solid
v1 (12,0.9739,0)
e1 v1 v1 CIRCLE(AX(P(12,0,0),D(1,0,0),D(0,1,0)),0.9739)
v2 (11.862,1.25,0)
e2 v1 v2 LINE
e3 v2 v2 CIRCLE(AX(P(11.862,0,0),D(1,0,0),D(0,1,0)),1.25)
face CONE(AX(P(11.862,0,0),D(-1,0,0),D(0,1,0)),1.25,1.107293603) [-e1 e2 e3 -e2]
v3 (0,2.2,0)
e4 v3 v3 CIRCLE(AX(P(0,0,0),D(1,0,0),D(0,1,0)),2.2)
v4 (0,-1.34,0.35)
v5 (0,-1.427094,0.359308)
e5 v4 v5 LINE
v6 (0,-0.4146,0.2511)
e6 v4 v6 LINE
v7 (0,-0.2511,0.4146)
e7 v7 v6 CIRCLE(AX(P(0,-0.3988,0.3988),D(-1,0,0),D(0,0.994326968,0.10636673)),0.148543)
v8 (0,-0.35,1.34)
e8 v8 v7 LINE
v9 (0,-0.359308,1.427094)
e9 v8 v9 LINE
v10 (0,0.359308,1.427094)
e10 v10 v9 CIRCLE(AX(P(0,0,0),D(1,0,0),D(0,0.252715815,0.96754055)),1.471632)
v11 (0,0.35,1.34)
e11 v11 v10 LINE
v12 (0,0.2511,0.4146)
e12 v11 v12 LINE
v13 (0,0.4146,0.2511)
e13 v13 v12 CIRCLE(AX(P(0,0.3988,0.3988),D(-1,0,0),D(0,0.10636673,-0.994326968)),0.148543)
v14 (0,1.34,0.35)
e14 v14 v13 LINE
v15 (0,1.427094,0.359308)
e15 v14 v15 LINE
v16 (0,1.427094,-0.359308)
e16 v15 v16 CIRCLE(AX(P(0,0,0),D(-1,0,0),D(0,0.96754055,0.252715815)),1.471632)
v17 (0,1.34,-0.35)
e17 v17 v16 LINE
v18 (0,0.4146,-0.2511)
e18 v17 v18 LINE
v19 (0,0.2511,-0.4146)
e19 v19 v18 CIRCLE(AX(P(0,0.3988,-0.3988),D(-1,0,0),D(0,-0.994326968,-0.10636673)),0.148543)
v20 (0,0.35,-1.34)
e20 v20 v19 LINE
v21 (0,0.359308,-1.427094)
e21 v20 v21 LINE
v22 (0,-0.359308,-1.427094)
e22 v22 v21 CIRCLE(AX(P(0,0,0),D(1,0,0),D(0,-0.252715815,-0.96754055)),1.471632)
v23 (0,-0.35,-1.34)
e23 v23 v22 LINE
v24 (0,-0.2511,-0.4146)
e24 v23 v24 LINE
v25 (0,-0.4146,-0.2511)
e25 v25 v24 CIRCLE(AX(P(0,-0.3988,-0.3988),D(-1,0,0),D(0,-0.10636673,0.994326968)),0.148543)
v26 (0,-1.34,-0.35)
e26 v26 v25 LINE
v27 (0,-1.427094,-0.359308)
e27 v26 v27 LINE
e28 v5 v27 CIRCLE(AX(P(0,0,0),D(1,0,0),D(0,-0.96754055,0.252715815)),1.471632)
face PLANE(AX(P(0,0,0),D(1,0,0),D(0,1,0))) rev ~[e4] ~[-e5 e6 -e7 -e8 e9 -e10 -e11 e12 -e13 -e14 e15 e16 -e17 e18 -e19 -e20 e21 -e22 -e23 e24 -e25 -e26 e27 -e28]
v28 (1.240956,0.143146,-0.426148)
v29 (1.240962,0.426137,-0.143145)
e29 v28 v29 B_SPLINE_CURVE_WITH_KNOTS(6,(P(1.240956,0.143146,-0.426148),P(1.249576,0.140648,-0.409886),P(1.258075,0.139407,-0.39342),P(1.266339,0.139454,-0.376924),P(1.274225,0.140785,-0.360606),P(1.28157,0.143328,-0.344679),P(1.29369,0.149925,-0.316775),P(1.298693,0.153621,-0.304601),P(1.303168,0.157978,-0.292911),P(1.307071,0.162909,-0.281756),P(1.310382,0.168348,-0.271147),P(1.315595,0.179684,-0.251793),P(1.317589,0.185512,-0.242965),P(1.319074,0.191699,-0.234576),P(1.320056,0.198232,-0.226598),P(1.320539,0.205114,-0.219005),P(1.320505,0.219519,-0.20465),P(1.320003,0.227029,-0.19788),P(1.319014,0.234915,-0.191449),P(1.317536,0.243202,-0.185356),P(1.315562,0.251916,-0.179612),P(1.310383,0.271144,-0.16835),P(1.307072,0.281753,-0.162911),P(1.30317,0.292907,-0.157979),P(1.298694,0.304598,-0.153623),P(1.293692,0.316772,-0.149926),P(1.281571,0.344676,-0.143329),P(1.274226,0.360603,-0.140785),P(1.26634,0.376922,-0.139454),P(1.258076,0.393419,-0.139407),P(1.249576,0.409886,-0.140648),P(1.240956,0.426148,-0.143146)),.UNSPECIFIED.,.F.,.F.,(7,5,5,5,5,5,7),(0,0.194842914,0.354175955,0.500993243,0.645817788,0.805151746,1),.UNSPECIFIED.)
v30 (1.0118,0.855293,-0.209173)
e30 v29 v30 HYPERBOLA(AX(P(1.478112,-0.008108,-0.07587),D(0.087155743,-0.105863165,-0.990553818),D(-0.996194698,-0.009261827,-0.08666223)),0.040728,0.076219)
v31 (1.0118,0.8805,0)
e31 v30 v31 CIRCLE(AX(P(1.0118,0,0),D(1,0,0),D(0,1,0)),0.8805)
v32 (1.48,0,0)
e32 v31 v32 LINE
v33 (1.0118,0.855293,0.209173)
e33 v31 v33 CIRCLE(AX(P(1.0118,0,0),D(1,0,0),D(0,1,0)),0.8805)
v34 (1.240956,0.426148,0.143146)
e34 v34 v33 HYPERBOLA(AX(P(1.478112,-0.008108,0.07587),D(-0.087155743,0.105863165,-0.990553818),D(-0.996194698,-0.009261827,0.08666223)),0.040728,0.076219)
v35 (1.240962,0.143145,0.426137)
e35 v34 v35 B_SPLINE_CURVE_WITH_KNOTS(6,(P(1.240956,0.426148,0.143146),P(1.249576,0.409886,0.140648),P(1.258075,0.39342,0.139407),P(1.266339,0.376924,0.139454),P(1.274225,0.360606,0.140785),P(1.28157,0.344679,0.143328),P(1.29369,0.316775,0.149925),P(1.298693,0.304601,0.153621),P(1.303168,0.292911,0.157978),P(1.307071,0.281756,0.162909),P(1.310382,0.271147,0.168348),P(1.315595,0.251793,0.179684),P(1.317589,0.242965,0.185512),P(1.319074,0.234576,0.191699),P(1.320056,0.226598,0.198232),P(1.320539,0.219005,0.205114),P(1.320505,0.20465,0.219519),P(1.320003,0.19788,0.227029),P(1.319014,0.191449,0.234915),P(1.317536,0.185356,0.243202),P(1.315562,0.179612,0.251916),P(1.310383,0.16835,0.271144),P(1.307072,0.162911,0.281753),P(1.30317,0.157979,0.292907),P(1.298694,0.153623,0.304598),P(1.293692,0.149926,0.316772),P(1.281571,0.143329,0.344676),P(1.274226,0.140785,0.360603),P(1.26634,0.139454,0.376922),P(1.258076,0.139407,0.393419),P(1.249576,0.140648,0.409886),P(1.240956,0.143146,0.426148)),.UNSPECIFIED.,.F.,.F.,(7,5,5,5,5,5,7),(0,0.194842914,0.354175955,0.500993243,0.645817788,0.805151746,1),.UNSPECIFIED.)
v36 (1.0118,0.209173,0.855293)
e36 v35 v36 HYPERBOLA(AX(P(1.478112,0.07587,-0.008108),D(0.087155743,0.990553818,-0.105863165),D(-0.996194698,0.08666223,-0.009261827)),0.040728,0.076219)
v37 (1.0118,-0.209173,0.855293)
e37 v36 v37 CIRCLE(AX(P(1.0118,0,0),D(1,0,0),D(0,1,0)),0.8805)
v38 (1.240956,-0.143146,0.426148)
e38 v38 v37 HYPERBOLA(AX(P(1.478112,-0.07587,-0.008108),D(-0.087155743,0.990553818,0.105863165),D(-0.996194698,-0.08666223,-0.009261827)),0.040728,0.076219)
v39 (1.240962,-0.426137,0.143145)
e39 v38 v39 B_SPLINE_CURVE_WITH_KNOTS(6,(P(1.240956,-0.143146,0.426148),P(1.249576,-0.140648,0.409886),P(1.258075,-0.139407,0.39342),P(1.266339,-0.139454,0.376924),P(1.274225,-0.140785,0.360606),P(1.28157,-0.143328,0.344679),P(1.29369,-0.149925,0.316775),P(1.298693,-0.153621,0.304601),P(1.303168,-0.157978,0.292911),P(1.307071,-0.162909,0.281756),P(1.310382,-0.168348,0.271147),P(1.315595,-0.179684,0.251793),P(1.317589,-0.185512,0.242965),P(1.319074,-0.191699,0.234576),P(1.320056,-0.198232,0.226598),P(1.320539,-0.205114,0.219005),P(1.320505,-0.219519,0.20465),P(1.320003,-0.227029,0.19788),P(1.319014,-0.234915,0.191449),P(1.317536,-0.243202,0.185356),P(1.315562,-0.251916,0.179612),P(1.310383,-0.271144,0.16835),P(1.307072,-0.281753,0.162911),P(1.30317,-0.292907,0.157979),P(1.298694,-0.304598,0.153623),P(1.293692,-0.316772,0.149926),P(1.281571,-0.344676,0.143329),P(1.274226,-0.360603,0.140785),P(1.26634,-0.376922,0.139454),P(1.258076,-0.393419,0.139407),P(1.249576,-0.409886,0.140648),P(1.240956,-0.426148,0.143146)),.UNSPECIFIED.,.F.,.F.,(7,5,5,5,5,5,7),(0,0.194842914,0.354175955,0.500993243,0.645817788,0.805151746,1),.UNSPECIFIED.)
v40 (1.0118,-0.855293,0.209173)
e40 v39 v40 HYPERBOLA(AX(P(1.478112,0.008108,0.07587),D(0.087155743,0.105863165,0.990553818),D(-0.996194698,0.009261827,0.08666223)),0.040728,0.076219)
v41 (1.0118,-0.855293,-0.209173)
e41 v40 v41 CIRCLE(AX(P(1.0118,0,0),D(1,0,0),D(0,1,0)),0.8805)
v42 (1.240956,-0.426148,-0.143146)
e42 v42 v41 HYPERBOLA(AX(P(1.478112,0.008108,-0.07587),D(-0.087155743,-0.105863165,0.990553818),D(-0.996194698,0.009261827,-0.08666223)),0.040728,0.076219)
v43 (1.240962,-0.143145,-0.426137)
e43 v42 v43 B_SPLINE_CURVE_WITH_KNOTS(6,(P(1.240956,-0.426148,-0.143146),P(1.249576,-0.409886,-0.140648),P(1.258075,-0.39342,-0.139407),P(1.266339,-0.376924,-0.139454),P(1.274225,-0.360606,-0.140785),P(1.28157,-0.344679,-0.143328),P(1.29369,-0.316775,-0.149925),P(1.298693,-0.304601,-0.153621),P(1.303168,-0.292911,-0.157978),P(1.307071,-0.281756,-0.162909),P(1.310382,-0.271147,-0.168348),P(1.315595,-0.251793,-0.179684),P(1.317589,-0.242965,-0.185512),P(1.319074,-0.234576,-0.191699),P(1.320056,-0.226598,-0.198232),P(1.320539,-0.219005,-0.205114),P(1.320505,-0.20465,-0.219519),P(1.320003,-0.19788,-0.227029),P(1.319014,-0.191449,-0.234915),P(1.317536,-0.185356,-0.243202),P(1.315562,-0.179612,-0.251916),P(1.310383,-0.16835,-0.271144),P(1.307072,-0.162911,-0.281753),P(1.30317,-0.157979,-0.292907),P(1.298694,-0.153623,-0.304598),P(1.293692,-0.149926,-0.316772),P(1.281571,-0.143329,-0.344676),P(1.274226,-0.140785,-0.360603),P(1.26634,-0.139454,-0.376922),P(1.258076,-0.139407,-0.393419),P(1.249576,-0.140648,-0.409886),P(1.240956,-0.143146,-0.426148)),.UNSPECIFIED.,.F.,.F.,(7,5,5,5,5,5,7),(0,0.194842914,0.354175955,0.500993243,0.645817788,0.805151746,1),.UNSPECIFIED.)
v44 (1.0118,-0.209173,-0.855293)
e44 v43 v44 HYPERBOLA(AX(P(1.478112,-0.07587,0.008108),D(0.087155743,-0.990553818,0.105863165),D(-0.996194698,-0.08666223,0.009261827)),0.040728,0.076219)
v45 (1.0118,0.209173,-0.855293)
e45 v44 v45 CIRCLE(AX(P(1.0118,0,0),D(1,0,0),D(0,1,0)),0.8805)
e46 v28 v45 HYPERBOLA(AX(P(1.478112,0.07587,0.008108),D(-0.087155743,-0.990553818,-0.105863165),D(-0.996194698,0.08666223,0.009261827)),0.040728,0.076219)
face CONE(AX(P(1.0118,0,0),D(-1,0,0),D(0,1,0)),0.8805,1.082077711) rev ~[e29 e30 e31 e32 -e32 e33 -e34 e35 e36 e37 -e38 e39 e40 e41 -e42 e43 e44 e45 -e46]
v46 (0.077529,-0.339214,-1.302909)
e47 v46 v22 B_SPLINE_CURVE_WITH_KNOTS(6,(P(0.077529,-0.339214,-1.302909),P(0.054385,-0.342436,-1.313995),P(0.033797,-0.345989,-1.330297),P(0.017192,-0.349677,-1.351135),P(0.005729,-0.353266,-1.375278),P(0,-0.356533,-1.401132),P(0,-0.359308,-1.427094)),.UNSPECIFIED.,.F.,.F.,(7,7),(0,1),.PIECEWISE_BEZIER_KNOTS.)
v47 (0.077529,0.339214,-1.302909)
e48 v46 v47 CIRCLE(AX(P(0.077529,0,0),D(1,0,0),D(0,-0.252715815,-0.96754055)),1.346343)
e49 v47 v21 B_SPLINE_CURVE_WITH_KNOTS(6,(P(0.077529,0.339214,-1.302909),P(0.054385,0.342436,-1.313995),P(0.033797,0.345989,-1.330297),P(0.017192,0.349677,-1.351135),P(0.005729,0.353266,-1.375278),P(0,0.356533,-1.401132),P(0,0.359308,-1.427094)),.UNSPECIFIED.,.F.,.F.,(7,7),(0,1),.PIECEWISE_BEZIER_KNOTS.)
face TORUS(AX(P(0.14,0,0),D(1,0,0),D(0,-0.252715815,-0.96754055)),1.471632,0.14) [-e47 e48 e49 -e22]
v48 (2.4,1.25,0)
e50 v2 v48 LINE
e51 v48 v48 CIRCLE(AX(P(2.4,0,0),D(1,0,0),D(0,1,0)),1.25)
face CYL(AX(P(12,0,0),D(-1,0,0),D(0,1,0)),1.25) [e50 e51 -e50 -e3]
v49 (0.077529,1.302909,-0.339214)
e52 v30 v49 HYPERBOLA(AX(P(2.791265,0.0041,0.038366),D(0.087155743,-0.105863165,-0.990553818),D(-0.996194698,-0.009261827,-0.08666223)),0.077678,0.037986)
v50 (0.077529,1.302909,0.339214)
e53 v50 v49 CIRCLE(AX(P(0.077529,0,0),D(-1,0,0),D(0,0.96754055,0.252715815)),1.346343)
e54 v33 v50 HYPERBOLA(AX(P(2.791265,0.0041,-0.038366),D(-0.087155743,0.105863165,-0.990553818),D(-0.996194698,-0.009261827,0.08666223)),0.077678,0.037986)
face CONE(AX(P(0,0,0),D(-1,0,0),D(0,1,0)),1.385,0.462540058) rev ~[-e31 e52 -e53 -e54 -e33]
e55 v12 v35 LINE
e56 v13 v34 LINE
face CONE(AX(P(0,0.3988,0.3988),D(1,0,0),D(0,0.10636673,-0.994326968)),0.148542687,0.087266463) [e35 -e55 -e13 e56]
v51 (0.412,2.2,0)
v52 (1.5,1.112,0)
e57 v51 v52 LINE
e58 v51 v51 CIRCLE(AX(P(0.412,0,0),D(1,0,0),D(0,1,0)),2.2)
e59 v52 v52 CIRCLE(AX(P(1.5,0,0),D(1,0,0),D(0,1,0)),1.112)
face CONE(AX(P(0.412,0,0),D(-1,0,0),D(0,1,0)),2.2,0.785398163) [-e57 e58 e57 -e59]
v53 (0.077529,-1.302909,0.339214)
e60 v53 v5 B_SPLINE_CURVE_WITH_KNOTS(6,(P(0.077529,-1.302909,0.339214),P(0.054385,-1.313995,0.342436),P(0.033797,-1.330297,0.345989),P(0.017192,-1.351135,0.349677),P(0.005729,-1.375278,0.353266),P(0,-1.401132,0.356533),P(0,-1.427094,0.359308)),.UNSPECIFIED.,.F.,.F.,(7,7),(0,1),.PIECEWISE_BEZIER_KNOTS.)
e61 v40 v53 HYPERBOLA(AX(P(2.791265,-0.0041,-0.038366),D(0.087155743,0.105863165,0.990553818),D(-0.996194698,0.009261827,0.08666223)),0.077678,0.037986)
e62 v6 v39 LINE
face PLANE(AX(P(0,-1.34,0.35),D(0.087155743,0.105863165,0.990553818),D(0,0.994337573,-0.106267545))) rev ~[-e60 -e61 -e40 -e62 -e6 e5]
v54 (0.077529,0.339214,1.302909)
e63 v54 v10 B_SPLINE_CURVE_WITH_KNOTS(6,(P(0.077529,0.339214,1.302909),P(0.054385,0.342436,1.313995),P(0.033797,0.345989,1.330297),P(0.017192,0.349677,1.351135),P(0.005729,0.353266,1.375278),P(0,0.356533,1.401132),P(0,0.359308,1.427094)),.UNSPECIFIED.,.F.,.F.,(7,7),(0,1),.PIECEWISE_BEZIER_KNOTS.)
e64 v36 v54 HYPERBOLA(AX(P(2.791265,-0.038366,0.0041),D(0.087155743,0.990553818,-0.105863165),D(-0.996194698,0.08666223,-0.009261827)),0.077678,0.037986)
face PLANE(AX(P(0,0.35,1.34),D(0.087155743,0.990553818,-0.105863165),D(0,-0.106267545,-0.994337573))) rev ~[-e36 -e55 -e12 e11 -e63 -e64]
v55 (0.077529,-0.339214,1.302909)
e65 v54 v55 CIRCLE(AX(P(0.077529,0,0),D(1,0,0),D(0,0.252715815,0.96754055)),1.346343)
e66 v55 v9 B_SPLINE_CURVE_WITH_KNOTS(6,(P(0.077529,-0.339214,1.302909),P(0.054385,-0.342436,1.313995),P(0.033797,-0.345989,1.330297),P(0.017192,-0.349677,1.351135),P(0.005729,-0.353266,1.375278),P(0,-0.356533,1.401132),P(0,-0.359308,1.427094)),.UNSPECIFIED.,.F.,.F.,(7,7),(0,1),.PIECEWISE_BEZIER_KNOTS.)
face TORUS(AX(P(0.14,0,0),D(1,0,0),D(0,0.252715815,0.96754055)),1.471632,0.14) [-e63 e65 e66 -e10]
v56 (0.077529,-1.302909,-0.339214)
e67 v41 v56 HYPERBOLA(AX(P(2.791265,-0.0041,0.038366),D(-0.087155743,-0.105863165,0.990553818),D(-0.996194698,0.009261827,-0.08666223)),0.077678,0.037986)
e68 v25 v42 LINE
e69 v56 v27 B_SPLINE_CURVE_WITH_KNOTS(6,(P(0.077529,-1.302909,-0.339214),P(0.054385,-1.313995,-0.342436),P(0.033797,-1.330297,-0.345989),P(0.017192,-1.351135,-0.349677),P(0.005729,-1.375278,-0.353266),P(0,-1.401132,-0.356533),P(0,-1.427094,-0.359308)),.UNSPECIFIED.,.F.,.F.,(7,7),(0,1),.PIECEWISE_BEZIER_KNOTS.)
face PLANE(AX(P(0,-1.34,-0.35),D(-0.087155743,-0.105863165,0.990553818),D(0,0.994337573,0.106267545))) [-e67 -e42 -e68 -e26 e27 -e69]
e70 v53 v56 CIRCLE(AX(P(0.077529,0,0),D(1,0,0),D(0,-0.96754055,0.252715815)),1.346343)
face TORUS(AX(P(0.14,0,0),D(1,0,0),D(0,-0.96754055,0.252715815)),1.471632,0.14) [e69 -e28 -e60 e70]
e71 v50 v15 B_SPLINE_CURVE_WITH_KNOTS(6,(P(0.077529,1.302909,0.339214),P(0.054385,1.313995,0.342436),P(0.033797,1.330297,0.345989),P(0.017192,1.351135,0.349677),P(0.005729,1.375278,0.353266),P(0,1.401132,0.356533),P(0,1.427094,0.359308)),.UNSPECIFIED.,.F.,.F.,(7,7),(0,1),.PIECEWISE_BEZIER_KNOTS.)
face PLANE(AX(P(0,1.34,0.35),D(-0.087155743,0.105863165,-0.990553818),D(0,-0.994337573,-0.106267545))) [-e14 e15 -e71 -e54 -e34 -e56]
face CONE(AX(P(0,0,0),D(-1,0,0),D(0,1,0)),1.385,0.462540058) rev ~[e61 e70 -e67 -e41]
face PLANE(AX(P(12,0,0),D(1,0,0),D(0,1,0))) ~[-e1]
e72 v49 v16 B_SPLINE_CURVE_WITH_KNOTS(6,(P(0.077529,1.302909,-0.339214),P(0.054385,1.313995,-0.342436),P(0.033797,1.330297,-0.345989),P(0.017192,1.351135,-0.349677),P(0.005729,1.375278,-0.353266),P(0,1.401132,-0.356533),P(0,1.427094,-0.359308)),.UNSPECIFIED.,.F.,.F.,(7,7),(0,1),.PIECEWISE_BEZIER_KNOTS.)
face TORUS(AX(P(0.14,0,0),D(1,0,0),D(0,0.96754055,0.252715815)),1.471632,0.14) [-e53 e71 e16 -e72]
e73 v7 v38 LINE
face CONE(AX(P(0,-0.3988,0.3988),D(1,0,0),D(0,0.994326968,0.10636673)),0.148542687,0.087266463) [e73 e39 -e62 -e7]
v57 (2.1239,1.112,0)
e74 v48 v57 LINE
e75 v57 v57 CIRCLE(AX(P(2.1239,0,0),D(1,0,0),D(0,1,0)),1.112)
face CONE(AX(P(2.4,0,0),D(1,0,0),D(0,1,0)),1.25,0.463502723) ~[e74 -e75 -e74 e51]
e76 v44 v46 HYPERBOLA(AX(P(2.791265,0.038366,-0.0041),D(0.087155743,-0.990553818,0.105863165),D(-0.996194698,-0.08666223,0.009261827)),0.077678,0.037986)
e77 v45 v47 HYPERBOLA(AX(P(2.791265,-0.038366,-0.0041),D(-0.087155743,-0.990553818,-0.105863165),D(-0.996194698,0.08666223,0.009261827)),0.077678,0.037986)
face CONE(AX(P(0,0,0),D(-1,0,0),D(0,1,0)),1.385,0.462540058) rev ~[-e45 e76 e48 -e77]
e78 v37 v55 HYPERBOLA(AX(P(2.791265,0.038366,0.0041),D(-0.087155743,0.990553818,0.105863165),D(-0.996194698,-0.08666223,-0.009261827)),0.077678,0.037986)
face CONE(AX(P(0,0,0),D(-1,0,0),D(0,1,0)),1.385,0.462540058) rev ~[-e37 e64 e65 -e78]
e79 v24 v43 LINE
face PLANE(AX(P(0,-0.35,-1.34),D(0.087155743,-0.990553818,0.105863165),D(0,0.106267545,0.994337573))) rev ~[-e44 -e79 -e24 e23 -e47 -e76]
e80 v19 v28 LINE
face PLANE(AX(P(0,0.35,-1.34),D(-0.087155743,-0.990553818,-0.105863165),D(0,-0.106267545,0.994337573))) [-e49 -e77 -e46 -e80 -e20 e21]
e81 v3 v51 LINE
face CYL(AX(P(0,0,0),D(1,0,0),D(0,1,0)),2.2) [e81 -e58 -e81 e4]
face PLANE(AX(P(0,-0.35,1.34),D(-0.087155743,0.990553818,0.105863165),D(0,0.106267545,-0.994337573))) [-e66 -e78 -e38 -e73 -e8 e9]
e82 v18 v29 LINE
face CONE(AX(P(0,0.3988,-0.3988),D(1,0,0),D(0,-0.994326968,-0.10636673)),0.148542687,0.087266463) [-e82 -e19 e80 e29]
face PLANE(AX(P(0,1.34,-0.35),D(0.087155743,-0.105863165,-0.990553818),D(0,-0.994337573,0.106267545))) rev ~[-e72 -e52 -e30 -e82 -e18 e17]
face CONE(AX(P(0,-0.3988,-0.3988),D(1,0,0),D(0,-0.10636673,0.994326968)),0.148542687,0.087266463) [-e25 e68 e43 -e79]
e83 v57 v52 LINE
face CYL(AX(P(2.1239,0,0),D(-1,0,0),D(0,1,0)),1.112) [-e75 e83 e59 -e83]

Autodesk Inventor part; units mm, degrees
ref_plane "YZ Plane" through (0, 0, 0) normal (1, 0, 0) x (0, 1, 0)
ref_plane "XZ Plane" through (0, 0, 0) normal (0, 1, 0) x (-1, 0, 0)
sketch "Sketch1" plane through (0, 0, 0) normal (0, 0, 1) x (1, 0, 0)
  line L0 (1.48, 0) -> (12, 0)
  line L1 (12, 0) -> (12, 1.25)
  line L2 (12, 1.25) -> (2.4, 1.25)
  line L3 (2.4, 1.25) -> (2.1239, 1.112)
  line L4 (2.1239, 1.112) -> (1.5, 1.112)
  line L5 (0, 2.2) -> (0, 1.385)
  line L6 (0, 1.385) -> (1.0118, 0.8805)
  line L7 (1.0118, 0.8805) -> (1.48, 0)
  line L8 (-2.4, 0) -> (14.4, 0) projected
  line L9 (0, -0.44) -> (0, 2.64) projected
  line L10 (0, 2.2) -> (0.412, 2.2)
  line L11 (0.412, 2.2) -> (1.5, 1.112)
  line L12 (2.4, 1.25) -> (1.362, 1.25) construction
  dimension "d1" = 9.6
  dimension "d2" = 2.5
  dimension "d3" = 2.2239
  dimension "d4" = 2.77
  dimension "d5" = 26.5
  dimension "d6" = 62
  dimension "d7" = 1.48
  dimension "d8" = 0.2761
  dimension "d12" = 4.4
  dimension "d13" = 45
  dimension "d15" = 12
  dimension "d24" = 1.5
revolve "Body" add sketch "Sketch1" angle 360 about axis through (1.48, 0, 0) along (1, 0, 0) contours L7 L6 L5 L10 L11 L4 L3 L2 L1 L0
sketch "Sketch2" plane through (0, 0, 0) normal (-1, 0, 0) x (0, 0, 1)
  line L0 (0, 1.385) -> (0, 0) construction
  line L1 (0, 0) -> (1.385, 0) construction
  arc A0 (0.4155, 0) -> (0, 0.4155) centre (0, 0) ccw construction
  arc A1 (0.4848, 0) -> (0, 0.4848) centre (0, 0) ccw construction
  arc A2 (1.34, 0.35) -> (0.35, 1.34) centre (0, 0) ccw
  line L2 (0, 0) -> (0.9793, 0.9793) construction
  line L3 (0.35, 1.34) -> (0.2511, 0.4146)
  line L4 (1.34, 0.35) -> (0.4146, 0.2511)
  arc A3 (0.35, 1.34) -> (0, 1.385) centre (0, 0) ccw
  arc A4 (1.385, 0) -> (1.34, 0.35) centre (0, 0) ccw
  line L5 (0, -3.08) -> (0, 3.08) projected
  line L6 (-3.08, 0) -> (3.08, 0) projected
  arc A5 (0.35, -1.34) -> (1.34, -0.35) centre (0, 0) ccw
  line L7 (0.35, -1.34) -> (0.2511, -0.4146)
  line L8 (1.34, -0.35) -> (0.4146, -0.2511)
  arc A6 (0, -1.385) -> (0.35, -1.34) centre (0, 0) ccw
  arc A7 (1.34, -0.35) -> (1.385, 0) centre (0, 0) ccw
  arc A8 (-0.35, 1.34) -> (-1.34, 0.35) centre (0, 0) ccw
  line L9 (-0.35, 1.34) -> (-0.2511, 0.4146)
  line L10 (-1.34, 0.35) -> (-0.4146, 0.2511)
  arc A9 (0, 1.385) -> (-0.35, 1.34) centre (0, 0) ccw
  arc A10 (-1.34, 0.35) -> (-1.385, 0) centre (0, 0) ccw
  arc A11 (-0.35, -1.34) -> (0, -1.385) centre (0, 0) ccw
  arc A12 (-1.34, -0.35) -> (-0.35, -1.34) centre (0, 0) ccw
  arc A13 (-1.385, 0) -> (-1.34, -0.35) centre (0, 0) ccw
  line L11 (-1.34, -0.35) -> (-0.4146, -0.2511)
  line L12 (-0.35, -1.34) -> (-0.2511, -0.4146)
  arc A14 (0.2511, 0.4146) -> (0.4146, 0.2511) centre (0.3988, 0.3988) ccw
  arc A15 (0.4146, -0.2511) -> (0.2511, -0.4146) centre (0.3988, -0.3988) ccw
  arc A16 (-0.4146, 0.2511) -> (-0.2511, 0.4146) centre (-0.3988, 0.3988) ccw
  arc A17 (-0.2511, -0.4146) -> (-0.4146, -0.2511) centre (-0.3988, -0.3988) ccw
  point P0 (0.9793, -0.9793)
  point P1 (-0.9793, 0.9793)
  point P2 (-0.9793, -0.9793)
  dimension "d17" = 0.831
  dimension "d18" = 0.9695
  dimension "d19" = 2.77
  dimension "d20" = 45
  dimension "d21" = 0.35
extrude "Slot" add sketch "Sketch2" against normal up to next draft 5 contours L4 A14 L3 A2 | A5 L7 A15 L8 | L9 A16 L10 A8 | A12 L11 A17 L12
fillet "Fillet1" radius 0.14 4 edges at (0, 1.385, 0) (0, 0, -1.385) (0, -1.385, 0) (0, 0, 1.385)
thread "Thread" size "M2.5x0.45" class "6g" standard "ISO Metric profile" length 9.6
chamfer "Chamfer1" distance 0.2761 distance2 0.138 1 edges at (12, -1.25, 0) measured on face at (12, -0.3689, 0.4922)
ref_plane "Work Plane2" through (3.35, 0, 0) normal (0, 0, -1) x (1, 0, 0)
equation "\"d17\" = 0.3 * SDM"
equation "\"d18\" = 0.35 * SDM"
equation "\"d19\" = SDM"
equation "\"d21\" = 0.5 * SBR"
equation "\"d1\" = GEL"
equation "\"d2\" = GD"
equation "\"d3\" = BDM"
equation "\"d4\" = SDM"
equation "\"d7\" = INTI"
equation "\"d8\" = GAL"
equation "\"d12\" = KOD"
equation "\"d13\" = 0.5 * SEWI"
equation "\"d15\" = NLG"
equation "\"d24\" = KOH"
equation "\"d23\" = 0.2 * SBR"
equation "\"d10\" = GEL"
equation "\"d25\" = -0.5 * SPD + 0.5 * GD"
equation "\"d26\" = 0.5 * GAL"
equation "\"NLG\" = 12"
equation "\"GEL\" = 9.6"
equation "\"GAL\" = 0.61345 * PTC"
equation "\"SPD\" = NND - 1.2269 * PTC"
equation "\"KOD\" = 4.4"
equation "\"KOH\" = 1.5"
equation "\"SBR\" = 0.7"
equation "\"INTI\" = 1.48"
equation "\"SDM\" = 2.77"
equation "\"GD\" = NND"
equation "\"BDM\" = NND - GAL"
equation "\"SEWI\" = 90deg"
equation "\"d9\" = SDM"
equation "\"GUL\" = 0.61345 * PTC"
equation "\"TOA\" = 30deg"
equation "\"EPV\" = 2.75"
equation "\"THREADDIA\" = 2.5"
equation "\"RR\" = 0.3"
equation "\"PTC\" = 0.45"
equation "\"NND\" = 2.5"
equation "\"GD1\" = THREADDIA - 1.2269 * PTC"
properties part number "AS 1427 - M2.5 x 12" material "Steel, Mild"
